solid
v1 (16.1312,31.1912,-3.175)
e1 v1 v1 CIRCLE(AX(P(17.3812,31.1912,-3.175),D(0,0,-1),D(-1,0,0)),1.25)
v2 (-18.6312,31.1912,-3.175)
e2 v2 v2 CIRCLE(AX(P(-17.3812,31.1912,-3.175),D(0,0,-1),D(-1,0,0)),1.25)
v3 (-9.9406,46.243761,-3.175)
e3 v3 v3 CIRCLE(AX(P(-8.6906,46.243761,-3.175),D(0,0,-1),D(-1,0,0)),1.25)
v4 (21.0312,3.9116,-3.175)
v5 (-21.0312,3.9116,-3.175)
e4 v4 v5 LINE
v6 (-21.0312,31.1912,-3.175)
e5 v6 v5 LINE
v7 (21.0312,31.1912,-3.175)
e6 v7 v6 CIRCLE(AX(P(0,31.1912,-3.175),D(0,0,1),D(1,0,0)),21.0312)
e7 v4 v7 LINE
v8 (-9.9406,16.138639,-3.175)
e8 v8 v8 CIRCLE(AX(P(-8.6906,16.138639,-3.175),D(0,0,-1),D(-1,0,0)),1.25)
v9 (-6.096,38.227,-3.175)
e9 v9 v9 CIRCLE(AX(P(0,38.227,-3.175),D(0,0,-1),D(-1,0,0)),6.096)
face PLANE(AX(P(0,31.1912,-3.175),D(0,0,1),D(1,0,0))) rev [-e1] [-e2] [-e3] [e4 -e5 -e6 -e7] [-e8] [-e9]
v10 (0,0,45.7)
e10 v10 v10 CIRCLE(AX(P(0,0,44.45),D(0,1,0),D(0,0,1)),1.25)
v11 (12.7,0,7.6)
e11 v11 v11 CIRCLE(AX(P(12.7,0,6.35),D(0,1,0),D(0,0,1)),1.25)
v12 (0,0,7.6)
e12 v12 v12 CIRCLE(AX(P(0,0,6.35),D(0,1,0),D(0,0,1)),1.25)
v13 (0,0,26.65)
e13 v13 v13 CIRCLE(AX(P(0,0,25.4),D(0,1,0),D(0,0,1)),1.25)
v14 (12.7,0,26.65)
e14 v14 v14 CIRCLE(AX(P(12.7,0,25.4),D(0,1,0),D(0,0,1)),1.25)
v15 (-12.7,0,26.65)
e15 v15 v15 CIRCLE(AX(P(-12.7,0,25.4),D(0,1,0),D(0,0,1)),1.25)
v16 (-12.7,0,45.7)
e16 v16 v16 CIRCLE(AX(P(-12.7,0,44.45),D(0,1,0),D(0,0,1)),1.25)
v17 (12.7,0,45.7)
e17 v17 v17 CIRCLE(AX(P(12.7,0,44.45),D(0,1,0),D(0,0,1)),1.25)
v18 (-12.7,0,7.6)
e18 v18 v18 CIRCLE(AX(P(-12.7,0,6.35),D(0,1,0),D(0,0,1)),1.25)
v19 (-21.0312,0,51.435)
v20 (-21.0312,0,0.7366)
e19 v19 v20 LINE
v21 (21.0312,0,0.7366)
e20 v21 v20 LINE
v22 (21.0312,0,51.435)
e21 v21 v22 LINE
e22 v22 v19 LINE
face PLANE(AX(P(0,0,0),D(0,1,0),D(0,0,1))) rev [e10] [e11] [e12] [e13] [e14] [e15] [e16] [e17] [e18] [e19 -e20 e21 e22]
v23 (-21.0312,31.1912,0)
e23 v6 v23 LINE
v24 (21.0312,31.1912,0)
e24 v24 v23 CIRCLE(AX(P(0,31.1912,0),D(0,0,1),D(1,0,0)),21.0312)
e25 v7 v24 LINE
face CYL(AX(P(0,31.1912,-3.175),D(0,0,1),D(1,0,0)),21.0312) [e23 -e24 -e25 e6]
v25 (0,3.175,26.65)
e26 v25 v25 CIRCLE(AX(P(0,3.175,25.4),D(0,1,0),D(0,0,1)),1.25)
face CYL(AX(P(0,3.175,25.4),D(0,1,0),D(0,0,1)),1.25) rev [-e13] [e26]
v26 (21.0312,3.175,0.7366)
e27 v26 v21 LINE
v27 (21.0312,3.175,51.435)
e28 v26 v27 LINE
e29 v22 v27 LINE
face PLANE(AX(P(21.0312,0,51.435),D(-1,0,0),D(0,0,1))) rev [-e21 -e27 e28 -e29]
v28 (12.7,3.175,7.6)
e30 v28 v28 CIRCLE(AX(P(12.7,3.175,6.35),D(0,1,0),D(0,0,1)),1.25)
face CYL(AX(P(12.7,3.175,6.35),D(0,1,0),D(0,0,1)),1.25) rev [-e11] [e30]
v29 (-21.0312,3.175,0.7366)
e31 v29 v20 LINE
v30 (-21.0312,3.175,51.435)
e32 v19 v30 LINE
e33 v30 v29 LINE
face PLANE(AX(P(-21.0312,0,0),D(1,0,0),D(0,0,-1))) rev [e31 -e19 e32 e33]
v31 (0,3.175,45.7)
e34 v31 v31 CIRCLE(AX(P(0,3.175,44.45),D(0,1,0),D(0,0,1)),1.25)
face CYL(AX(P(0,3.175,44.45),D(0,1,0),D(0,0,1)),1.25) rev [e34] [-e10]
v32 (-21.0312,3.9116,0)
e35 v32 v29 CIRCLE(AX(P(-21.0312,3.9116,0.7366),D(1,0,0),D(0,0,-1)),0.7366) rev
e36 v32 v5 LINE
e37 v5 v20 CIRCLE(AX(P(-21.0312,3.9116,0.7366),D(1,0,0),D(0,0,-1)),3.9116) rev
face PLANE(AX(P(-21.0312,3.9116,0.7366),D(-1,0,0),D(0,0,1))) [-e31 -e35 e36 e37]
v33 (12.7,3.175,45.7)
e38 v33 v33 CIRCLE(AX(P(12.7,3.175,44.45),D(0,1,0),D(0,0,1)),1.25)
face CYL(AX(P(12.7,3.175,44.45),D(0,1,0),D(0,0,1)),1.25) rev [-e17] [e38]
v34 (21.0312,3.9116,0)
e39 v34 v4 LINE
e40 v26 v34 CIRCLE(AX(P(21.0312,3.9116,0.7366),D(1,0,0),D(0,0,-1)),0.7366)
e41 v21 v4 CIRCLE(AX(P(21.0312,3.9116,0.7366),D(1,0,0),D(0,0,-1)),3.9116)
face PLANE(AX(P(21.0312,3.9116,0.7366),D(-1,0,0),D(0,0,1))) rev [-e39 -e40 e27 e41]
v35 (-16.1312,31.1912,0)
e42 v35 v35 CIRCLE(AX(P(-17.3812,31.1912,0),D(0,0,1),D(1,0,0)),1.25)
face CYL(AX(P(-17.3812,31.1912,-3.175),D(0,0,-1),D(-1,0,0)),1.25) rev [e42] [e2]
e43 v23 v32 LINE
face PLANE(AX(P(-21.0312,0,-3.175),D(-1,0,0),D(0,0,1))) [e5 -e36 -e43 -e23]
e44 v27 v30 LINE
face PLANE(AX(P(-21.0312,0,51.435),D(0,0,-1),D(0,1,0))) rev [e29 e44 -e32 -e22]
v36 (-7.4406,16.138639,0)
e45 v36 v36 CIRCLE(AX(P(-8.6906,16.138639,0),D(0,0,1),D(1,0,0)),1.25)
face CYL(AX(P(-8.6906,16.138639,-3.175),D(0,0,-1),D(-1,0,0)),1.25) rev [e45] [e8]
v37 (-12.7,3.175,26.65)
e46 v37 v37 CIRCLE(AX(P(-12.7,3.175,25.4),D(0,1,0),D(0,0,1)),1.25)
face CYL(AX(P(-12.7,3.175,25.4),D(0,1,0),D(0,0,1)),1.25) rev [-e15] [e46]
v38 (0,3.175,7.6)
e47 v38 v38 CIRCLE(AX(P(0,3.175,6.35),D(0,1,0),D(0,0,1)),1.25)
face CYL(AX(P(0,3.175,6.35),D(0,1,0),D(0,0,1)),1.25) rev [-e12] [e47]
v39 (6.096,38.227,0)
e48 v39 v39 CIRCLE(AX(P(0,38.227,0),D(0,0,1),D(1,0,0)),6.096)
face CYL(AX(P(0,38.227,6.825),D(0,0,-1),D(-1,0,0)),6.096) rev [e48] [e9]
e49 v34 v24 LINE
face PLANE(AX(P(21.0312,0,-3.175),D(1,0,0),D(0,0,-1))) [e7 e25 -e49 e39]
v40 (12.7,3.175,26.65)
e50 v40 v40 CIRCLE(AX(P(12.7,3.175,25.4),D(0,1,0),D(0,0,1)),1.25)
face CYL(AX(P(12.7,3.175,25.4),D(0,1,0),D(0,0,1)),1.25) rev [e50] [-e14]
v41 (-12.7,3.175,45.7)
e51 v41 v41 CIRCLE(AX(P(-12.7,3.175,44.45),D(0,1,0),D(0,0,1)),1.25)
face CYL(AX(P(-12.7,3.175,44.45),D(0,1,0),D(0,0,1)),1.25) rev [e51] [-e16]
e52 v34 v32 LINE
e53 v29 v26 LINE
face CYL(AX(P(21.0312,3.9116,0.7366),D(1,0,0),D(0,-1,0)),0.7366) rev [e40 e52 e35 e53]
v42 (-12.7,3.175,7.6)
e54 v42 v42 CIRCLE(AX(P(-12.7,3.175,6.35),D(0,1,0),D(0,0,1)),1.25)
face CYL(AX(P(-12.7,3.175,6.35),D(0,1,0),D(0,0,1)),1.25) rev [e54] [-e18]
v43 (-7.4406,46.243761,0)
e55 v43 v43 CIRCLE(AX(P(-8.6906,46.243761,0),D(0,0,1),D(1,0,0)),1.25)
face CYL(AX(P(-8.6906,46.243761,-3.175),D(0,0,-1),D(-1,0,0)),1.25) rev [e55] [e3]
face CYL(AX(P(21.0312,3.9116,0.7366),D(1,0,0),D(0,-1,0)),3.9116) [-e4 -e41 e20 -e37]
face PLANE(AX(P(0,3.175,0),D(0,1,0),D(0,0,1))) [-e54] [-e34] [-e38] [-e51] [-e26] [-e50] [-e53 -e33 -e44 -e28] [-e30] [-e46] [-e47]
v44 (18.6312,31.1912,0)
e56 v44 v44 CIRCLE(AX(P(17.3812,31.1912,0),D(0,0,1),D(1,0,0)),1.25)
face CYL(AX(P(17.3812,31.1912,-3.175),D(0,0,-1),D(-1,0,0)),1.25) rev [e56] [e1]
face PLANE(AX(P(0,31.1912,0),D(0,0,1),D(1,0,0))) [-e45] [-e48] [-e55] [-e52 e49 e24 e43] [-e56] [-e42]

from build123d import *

# Parameters (mm, degrees)
BASE_FLANGIA1_DEPTH            = 3.175
BORDO_FLANGIA1_STRIP_W         = 14.1732
BORDO_FLANGIA1_STRIP_H         = 3.175
BORDO_FLANGIA1_STRIP_CUT_DEPTH = 42.0624
BORDO_FLANGIA1_DEPTH           = 42.0624
RIPETIZIONE_A_L1_COUNT         = 3
RIPETIZIONE_A_L1_PITCH         = 19.05
RIPETIZIONE_A_L1_COUNT_DIR2    = 3
RIPETIZIONE_A_L1_PITCH_DIR2    = 12.7
RIPETIZIONECIRCOLARE1_COUNT    = 6
SCHIZZO13_R                    = 6.096
TAGLIO_ESTRUSIONE1_DEPTH       = 10


# Sheet-metal steps are written as plain solids
with BuildPart() as part:
    # Schizzo1 → Base-Flangia1 (new body)
    with BuildSketch(Plane.XY):
        with BuildLine():
            Line((-21.0312, 0), (21.0312, 0))
            Line((21.0312, 0), (21.0312, 31.1912))
            ThreePointArc((21.0312, 31.1912), (0, 52.2224), (-21.0312, 31.1912))
            Line((-21.0312, 31.1912), (-21.0312, 0))
        make_face()
    extrude(amount=-BASE_FLANGIA1_DEPTH)

    # Bordo-Flangia1 strip (across the edge) → Bordo-Flangia1 strip cut (cut)
    with BuildSketch(Plane.YZ.offset(-21.0312)):
        with Locations((-3.175, -1.5875)):
            Rectangle(BORDO_FLANGIA1_STRIP_W, BORDO_FLANGIA1_STRIP_H)
    extrude(amount=BORDO_FLANGIA1_STRIP_CUT_DEPTH, mode=Mode.SUBTRACT)

    # Bordo-Flangia1 section (across the edge) → Bordo-Flangia1 (add)
    with BuildSketch(Plane.YZ.offset(-21.0312)):
        with BuildLine():
            Line((0, 0.7366), (0, 51.435))
            Line((0, 51.435), (3.175, 51.435))
            Line((3.175, 51.435), (3.175, 0.7366))
            ThreePointArc((3.175, 0.7366), (3.390745145, 0.215745145), (3.9116, 0))
            Line((3.9116, 0), (3.9116, -3.175))
            ThreePointArc((3.9116, -3.175), (1.145681115, -2.029318885), (0, 0.7366))
        make_face()
    extrude(amount=BORDO_FLANGIA1_DEPTH)

    # Schizzo9 → Foro filettato M3x0.5-1 (revolve, cut)
    with BuildSketch(Plane(origin=(-12.7, 3.175, 6.35), x_dir=(0, 0, 1), z_dir=(1, 0, 0))):
        Polygon((0, 0), (0, 8.251075774), (1.25, 7.5), (1.25, 0), align=None)
    foro_filettato_m3x0_5_1 = revolve(axis=Axis((-12.7, 9.525, 6.35), (0, -1, 0)), mode=Mode.SUBTRACT)

    # Ripetizione a L1: Foro filettato M3x0.5-1 3 × 3
    with Locations(*[(j * RIPETIZIONE_A_L1_PITCH_DIR2, 0, i * RIPETIZIONE_A_L1_PITCH) for i in range(RIPETIZIONE_A_L1_COUNT) for j in range(RIPETIZIONE_A_L1_COUNT_DIR2) if (i, j) != (0, 0)]):
        add(foro_filettato_m3x0_5_1, mode=Mode.SUBTRACT)

    # Schizzo11 → Foro filettato M3x0.5-2 (revolve, cut)
    with BuildSketch(Plane(origin=(-17.3812, 31.1912, -3.175), x_dir=(0, 1, 0), z_dir=(1, 0, 0))):
        Polygon((0, 0), (0, 8.251075774), (1.25, 7.5), (1.25, 0), align=None)
    foro_filettato_m3x0_5_2 = revolve(axis=Axis((-17.3812, 31.1912, -9.525), (0, 0, 1)), mode=Mode.SUBTRACT)

    # RipetizioneCircolare1: Foro filettato M3x0.5-2 ×6 about axis, 2 skipped
    ripetizionecircolare1_axis = Axis((0, 31.1912, 0), (0, 0, 1))
    add([foro_filettato_m3x0_5_2.rotate(ripetizionecircolare1_axis, i * 360 / RIPETIZIONECIRCOLARE1_COUNT) for i in range(1, RIPETIZIONECIRCOLARE1_COUNT) if i not in (2, 4)], mode=Mode.SUBTRACT)

    # Schizzo13 → Taglio-Estrusione1 (cut)
    with BuildSketch(Plane(origin=(0, 0, -3.175), x_dir=(-1, 0, 0), z_dir=(0, 0, -1))):
        with Locations((0, 38.227)):
            Circle(SCHIZZO13_R)
    extrude(amount=-TAGLIO_ESTRUSIONE1_DEPTH, mode=Mode.SUBTRACT)


solid = part.part
